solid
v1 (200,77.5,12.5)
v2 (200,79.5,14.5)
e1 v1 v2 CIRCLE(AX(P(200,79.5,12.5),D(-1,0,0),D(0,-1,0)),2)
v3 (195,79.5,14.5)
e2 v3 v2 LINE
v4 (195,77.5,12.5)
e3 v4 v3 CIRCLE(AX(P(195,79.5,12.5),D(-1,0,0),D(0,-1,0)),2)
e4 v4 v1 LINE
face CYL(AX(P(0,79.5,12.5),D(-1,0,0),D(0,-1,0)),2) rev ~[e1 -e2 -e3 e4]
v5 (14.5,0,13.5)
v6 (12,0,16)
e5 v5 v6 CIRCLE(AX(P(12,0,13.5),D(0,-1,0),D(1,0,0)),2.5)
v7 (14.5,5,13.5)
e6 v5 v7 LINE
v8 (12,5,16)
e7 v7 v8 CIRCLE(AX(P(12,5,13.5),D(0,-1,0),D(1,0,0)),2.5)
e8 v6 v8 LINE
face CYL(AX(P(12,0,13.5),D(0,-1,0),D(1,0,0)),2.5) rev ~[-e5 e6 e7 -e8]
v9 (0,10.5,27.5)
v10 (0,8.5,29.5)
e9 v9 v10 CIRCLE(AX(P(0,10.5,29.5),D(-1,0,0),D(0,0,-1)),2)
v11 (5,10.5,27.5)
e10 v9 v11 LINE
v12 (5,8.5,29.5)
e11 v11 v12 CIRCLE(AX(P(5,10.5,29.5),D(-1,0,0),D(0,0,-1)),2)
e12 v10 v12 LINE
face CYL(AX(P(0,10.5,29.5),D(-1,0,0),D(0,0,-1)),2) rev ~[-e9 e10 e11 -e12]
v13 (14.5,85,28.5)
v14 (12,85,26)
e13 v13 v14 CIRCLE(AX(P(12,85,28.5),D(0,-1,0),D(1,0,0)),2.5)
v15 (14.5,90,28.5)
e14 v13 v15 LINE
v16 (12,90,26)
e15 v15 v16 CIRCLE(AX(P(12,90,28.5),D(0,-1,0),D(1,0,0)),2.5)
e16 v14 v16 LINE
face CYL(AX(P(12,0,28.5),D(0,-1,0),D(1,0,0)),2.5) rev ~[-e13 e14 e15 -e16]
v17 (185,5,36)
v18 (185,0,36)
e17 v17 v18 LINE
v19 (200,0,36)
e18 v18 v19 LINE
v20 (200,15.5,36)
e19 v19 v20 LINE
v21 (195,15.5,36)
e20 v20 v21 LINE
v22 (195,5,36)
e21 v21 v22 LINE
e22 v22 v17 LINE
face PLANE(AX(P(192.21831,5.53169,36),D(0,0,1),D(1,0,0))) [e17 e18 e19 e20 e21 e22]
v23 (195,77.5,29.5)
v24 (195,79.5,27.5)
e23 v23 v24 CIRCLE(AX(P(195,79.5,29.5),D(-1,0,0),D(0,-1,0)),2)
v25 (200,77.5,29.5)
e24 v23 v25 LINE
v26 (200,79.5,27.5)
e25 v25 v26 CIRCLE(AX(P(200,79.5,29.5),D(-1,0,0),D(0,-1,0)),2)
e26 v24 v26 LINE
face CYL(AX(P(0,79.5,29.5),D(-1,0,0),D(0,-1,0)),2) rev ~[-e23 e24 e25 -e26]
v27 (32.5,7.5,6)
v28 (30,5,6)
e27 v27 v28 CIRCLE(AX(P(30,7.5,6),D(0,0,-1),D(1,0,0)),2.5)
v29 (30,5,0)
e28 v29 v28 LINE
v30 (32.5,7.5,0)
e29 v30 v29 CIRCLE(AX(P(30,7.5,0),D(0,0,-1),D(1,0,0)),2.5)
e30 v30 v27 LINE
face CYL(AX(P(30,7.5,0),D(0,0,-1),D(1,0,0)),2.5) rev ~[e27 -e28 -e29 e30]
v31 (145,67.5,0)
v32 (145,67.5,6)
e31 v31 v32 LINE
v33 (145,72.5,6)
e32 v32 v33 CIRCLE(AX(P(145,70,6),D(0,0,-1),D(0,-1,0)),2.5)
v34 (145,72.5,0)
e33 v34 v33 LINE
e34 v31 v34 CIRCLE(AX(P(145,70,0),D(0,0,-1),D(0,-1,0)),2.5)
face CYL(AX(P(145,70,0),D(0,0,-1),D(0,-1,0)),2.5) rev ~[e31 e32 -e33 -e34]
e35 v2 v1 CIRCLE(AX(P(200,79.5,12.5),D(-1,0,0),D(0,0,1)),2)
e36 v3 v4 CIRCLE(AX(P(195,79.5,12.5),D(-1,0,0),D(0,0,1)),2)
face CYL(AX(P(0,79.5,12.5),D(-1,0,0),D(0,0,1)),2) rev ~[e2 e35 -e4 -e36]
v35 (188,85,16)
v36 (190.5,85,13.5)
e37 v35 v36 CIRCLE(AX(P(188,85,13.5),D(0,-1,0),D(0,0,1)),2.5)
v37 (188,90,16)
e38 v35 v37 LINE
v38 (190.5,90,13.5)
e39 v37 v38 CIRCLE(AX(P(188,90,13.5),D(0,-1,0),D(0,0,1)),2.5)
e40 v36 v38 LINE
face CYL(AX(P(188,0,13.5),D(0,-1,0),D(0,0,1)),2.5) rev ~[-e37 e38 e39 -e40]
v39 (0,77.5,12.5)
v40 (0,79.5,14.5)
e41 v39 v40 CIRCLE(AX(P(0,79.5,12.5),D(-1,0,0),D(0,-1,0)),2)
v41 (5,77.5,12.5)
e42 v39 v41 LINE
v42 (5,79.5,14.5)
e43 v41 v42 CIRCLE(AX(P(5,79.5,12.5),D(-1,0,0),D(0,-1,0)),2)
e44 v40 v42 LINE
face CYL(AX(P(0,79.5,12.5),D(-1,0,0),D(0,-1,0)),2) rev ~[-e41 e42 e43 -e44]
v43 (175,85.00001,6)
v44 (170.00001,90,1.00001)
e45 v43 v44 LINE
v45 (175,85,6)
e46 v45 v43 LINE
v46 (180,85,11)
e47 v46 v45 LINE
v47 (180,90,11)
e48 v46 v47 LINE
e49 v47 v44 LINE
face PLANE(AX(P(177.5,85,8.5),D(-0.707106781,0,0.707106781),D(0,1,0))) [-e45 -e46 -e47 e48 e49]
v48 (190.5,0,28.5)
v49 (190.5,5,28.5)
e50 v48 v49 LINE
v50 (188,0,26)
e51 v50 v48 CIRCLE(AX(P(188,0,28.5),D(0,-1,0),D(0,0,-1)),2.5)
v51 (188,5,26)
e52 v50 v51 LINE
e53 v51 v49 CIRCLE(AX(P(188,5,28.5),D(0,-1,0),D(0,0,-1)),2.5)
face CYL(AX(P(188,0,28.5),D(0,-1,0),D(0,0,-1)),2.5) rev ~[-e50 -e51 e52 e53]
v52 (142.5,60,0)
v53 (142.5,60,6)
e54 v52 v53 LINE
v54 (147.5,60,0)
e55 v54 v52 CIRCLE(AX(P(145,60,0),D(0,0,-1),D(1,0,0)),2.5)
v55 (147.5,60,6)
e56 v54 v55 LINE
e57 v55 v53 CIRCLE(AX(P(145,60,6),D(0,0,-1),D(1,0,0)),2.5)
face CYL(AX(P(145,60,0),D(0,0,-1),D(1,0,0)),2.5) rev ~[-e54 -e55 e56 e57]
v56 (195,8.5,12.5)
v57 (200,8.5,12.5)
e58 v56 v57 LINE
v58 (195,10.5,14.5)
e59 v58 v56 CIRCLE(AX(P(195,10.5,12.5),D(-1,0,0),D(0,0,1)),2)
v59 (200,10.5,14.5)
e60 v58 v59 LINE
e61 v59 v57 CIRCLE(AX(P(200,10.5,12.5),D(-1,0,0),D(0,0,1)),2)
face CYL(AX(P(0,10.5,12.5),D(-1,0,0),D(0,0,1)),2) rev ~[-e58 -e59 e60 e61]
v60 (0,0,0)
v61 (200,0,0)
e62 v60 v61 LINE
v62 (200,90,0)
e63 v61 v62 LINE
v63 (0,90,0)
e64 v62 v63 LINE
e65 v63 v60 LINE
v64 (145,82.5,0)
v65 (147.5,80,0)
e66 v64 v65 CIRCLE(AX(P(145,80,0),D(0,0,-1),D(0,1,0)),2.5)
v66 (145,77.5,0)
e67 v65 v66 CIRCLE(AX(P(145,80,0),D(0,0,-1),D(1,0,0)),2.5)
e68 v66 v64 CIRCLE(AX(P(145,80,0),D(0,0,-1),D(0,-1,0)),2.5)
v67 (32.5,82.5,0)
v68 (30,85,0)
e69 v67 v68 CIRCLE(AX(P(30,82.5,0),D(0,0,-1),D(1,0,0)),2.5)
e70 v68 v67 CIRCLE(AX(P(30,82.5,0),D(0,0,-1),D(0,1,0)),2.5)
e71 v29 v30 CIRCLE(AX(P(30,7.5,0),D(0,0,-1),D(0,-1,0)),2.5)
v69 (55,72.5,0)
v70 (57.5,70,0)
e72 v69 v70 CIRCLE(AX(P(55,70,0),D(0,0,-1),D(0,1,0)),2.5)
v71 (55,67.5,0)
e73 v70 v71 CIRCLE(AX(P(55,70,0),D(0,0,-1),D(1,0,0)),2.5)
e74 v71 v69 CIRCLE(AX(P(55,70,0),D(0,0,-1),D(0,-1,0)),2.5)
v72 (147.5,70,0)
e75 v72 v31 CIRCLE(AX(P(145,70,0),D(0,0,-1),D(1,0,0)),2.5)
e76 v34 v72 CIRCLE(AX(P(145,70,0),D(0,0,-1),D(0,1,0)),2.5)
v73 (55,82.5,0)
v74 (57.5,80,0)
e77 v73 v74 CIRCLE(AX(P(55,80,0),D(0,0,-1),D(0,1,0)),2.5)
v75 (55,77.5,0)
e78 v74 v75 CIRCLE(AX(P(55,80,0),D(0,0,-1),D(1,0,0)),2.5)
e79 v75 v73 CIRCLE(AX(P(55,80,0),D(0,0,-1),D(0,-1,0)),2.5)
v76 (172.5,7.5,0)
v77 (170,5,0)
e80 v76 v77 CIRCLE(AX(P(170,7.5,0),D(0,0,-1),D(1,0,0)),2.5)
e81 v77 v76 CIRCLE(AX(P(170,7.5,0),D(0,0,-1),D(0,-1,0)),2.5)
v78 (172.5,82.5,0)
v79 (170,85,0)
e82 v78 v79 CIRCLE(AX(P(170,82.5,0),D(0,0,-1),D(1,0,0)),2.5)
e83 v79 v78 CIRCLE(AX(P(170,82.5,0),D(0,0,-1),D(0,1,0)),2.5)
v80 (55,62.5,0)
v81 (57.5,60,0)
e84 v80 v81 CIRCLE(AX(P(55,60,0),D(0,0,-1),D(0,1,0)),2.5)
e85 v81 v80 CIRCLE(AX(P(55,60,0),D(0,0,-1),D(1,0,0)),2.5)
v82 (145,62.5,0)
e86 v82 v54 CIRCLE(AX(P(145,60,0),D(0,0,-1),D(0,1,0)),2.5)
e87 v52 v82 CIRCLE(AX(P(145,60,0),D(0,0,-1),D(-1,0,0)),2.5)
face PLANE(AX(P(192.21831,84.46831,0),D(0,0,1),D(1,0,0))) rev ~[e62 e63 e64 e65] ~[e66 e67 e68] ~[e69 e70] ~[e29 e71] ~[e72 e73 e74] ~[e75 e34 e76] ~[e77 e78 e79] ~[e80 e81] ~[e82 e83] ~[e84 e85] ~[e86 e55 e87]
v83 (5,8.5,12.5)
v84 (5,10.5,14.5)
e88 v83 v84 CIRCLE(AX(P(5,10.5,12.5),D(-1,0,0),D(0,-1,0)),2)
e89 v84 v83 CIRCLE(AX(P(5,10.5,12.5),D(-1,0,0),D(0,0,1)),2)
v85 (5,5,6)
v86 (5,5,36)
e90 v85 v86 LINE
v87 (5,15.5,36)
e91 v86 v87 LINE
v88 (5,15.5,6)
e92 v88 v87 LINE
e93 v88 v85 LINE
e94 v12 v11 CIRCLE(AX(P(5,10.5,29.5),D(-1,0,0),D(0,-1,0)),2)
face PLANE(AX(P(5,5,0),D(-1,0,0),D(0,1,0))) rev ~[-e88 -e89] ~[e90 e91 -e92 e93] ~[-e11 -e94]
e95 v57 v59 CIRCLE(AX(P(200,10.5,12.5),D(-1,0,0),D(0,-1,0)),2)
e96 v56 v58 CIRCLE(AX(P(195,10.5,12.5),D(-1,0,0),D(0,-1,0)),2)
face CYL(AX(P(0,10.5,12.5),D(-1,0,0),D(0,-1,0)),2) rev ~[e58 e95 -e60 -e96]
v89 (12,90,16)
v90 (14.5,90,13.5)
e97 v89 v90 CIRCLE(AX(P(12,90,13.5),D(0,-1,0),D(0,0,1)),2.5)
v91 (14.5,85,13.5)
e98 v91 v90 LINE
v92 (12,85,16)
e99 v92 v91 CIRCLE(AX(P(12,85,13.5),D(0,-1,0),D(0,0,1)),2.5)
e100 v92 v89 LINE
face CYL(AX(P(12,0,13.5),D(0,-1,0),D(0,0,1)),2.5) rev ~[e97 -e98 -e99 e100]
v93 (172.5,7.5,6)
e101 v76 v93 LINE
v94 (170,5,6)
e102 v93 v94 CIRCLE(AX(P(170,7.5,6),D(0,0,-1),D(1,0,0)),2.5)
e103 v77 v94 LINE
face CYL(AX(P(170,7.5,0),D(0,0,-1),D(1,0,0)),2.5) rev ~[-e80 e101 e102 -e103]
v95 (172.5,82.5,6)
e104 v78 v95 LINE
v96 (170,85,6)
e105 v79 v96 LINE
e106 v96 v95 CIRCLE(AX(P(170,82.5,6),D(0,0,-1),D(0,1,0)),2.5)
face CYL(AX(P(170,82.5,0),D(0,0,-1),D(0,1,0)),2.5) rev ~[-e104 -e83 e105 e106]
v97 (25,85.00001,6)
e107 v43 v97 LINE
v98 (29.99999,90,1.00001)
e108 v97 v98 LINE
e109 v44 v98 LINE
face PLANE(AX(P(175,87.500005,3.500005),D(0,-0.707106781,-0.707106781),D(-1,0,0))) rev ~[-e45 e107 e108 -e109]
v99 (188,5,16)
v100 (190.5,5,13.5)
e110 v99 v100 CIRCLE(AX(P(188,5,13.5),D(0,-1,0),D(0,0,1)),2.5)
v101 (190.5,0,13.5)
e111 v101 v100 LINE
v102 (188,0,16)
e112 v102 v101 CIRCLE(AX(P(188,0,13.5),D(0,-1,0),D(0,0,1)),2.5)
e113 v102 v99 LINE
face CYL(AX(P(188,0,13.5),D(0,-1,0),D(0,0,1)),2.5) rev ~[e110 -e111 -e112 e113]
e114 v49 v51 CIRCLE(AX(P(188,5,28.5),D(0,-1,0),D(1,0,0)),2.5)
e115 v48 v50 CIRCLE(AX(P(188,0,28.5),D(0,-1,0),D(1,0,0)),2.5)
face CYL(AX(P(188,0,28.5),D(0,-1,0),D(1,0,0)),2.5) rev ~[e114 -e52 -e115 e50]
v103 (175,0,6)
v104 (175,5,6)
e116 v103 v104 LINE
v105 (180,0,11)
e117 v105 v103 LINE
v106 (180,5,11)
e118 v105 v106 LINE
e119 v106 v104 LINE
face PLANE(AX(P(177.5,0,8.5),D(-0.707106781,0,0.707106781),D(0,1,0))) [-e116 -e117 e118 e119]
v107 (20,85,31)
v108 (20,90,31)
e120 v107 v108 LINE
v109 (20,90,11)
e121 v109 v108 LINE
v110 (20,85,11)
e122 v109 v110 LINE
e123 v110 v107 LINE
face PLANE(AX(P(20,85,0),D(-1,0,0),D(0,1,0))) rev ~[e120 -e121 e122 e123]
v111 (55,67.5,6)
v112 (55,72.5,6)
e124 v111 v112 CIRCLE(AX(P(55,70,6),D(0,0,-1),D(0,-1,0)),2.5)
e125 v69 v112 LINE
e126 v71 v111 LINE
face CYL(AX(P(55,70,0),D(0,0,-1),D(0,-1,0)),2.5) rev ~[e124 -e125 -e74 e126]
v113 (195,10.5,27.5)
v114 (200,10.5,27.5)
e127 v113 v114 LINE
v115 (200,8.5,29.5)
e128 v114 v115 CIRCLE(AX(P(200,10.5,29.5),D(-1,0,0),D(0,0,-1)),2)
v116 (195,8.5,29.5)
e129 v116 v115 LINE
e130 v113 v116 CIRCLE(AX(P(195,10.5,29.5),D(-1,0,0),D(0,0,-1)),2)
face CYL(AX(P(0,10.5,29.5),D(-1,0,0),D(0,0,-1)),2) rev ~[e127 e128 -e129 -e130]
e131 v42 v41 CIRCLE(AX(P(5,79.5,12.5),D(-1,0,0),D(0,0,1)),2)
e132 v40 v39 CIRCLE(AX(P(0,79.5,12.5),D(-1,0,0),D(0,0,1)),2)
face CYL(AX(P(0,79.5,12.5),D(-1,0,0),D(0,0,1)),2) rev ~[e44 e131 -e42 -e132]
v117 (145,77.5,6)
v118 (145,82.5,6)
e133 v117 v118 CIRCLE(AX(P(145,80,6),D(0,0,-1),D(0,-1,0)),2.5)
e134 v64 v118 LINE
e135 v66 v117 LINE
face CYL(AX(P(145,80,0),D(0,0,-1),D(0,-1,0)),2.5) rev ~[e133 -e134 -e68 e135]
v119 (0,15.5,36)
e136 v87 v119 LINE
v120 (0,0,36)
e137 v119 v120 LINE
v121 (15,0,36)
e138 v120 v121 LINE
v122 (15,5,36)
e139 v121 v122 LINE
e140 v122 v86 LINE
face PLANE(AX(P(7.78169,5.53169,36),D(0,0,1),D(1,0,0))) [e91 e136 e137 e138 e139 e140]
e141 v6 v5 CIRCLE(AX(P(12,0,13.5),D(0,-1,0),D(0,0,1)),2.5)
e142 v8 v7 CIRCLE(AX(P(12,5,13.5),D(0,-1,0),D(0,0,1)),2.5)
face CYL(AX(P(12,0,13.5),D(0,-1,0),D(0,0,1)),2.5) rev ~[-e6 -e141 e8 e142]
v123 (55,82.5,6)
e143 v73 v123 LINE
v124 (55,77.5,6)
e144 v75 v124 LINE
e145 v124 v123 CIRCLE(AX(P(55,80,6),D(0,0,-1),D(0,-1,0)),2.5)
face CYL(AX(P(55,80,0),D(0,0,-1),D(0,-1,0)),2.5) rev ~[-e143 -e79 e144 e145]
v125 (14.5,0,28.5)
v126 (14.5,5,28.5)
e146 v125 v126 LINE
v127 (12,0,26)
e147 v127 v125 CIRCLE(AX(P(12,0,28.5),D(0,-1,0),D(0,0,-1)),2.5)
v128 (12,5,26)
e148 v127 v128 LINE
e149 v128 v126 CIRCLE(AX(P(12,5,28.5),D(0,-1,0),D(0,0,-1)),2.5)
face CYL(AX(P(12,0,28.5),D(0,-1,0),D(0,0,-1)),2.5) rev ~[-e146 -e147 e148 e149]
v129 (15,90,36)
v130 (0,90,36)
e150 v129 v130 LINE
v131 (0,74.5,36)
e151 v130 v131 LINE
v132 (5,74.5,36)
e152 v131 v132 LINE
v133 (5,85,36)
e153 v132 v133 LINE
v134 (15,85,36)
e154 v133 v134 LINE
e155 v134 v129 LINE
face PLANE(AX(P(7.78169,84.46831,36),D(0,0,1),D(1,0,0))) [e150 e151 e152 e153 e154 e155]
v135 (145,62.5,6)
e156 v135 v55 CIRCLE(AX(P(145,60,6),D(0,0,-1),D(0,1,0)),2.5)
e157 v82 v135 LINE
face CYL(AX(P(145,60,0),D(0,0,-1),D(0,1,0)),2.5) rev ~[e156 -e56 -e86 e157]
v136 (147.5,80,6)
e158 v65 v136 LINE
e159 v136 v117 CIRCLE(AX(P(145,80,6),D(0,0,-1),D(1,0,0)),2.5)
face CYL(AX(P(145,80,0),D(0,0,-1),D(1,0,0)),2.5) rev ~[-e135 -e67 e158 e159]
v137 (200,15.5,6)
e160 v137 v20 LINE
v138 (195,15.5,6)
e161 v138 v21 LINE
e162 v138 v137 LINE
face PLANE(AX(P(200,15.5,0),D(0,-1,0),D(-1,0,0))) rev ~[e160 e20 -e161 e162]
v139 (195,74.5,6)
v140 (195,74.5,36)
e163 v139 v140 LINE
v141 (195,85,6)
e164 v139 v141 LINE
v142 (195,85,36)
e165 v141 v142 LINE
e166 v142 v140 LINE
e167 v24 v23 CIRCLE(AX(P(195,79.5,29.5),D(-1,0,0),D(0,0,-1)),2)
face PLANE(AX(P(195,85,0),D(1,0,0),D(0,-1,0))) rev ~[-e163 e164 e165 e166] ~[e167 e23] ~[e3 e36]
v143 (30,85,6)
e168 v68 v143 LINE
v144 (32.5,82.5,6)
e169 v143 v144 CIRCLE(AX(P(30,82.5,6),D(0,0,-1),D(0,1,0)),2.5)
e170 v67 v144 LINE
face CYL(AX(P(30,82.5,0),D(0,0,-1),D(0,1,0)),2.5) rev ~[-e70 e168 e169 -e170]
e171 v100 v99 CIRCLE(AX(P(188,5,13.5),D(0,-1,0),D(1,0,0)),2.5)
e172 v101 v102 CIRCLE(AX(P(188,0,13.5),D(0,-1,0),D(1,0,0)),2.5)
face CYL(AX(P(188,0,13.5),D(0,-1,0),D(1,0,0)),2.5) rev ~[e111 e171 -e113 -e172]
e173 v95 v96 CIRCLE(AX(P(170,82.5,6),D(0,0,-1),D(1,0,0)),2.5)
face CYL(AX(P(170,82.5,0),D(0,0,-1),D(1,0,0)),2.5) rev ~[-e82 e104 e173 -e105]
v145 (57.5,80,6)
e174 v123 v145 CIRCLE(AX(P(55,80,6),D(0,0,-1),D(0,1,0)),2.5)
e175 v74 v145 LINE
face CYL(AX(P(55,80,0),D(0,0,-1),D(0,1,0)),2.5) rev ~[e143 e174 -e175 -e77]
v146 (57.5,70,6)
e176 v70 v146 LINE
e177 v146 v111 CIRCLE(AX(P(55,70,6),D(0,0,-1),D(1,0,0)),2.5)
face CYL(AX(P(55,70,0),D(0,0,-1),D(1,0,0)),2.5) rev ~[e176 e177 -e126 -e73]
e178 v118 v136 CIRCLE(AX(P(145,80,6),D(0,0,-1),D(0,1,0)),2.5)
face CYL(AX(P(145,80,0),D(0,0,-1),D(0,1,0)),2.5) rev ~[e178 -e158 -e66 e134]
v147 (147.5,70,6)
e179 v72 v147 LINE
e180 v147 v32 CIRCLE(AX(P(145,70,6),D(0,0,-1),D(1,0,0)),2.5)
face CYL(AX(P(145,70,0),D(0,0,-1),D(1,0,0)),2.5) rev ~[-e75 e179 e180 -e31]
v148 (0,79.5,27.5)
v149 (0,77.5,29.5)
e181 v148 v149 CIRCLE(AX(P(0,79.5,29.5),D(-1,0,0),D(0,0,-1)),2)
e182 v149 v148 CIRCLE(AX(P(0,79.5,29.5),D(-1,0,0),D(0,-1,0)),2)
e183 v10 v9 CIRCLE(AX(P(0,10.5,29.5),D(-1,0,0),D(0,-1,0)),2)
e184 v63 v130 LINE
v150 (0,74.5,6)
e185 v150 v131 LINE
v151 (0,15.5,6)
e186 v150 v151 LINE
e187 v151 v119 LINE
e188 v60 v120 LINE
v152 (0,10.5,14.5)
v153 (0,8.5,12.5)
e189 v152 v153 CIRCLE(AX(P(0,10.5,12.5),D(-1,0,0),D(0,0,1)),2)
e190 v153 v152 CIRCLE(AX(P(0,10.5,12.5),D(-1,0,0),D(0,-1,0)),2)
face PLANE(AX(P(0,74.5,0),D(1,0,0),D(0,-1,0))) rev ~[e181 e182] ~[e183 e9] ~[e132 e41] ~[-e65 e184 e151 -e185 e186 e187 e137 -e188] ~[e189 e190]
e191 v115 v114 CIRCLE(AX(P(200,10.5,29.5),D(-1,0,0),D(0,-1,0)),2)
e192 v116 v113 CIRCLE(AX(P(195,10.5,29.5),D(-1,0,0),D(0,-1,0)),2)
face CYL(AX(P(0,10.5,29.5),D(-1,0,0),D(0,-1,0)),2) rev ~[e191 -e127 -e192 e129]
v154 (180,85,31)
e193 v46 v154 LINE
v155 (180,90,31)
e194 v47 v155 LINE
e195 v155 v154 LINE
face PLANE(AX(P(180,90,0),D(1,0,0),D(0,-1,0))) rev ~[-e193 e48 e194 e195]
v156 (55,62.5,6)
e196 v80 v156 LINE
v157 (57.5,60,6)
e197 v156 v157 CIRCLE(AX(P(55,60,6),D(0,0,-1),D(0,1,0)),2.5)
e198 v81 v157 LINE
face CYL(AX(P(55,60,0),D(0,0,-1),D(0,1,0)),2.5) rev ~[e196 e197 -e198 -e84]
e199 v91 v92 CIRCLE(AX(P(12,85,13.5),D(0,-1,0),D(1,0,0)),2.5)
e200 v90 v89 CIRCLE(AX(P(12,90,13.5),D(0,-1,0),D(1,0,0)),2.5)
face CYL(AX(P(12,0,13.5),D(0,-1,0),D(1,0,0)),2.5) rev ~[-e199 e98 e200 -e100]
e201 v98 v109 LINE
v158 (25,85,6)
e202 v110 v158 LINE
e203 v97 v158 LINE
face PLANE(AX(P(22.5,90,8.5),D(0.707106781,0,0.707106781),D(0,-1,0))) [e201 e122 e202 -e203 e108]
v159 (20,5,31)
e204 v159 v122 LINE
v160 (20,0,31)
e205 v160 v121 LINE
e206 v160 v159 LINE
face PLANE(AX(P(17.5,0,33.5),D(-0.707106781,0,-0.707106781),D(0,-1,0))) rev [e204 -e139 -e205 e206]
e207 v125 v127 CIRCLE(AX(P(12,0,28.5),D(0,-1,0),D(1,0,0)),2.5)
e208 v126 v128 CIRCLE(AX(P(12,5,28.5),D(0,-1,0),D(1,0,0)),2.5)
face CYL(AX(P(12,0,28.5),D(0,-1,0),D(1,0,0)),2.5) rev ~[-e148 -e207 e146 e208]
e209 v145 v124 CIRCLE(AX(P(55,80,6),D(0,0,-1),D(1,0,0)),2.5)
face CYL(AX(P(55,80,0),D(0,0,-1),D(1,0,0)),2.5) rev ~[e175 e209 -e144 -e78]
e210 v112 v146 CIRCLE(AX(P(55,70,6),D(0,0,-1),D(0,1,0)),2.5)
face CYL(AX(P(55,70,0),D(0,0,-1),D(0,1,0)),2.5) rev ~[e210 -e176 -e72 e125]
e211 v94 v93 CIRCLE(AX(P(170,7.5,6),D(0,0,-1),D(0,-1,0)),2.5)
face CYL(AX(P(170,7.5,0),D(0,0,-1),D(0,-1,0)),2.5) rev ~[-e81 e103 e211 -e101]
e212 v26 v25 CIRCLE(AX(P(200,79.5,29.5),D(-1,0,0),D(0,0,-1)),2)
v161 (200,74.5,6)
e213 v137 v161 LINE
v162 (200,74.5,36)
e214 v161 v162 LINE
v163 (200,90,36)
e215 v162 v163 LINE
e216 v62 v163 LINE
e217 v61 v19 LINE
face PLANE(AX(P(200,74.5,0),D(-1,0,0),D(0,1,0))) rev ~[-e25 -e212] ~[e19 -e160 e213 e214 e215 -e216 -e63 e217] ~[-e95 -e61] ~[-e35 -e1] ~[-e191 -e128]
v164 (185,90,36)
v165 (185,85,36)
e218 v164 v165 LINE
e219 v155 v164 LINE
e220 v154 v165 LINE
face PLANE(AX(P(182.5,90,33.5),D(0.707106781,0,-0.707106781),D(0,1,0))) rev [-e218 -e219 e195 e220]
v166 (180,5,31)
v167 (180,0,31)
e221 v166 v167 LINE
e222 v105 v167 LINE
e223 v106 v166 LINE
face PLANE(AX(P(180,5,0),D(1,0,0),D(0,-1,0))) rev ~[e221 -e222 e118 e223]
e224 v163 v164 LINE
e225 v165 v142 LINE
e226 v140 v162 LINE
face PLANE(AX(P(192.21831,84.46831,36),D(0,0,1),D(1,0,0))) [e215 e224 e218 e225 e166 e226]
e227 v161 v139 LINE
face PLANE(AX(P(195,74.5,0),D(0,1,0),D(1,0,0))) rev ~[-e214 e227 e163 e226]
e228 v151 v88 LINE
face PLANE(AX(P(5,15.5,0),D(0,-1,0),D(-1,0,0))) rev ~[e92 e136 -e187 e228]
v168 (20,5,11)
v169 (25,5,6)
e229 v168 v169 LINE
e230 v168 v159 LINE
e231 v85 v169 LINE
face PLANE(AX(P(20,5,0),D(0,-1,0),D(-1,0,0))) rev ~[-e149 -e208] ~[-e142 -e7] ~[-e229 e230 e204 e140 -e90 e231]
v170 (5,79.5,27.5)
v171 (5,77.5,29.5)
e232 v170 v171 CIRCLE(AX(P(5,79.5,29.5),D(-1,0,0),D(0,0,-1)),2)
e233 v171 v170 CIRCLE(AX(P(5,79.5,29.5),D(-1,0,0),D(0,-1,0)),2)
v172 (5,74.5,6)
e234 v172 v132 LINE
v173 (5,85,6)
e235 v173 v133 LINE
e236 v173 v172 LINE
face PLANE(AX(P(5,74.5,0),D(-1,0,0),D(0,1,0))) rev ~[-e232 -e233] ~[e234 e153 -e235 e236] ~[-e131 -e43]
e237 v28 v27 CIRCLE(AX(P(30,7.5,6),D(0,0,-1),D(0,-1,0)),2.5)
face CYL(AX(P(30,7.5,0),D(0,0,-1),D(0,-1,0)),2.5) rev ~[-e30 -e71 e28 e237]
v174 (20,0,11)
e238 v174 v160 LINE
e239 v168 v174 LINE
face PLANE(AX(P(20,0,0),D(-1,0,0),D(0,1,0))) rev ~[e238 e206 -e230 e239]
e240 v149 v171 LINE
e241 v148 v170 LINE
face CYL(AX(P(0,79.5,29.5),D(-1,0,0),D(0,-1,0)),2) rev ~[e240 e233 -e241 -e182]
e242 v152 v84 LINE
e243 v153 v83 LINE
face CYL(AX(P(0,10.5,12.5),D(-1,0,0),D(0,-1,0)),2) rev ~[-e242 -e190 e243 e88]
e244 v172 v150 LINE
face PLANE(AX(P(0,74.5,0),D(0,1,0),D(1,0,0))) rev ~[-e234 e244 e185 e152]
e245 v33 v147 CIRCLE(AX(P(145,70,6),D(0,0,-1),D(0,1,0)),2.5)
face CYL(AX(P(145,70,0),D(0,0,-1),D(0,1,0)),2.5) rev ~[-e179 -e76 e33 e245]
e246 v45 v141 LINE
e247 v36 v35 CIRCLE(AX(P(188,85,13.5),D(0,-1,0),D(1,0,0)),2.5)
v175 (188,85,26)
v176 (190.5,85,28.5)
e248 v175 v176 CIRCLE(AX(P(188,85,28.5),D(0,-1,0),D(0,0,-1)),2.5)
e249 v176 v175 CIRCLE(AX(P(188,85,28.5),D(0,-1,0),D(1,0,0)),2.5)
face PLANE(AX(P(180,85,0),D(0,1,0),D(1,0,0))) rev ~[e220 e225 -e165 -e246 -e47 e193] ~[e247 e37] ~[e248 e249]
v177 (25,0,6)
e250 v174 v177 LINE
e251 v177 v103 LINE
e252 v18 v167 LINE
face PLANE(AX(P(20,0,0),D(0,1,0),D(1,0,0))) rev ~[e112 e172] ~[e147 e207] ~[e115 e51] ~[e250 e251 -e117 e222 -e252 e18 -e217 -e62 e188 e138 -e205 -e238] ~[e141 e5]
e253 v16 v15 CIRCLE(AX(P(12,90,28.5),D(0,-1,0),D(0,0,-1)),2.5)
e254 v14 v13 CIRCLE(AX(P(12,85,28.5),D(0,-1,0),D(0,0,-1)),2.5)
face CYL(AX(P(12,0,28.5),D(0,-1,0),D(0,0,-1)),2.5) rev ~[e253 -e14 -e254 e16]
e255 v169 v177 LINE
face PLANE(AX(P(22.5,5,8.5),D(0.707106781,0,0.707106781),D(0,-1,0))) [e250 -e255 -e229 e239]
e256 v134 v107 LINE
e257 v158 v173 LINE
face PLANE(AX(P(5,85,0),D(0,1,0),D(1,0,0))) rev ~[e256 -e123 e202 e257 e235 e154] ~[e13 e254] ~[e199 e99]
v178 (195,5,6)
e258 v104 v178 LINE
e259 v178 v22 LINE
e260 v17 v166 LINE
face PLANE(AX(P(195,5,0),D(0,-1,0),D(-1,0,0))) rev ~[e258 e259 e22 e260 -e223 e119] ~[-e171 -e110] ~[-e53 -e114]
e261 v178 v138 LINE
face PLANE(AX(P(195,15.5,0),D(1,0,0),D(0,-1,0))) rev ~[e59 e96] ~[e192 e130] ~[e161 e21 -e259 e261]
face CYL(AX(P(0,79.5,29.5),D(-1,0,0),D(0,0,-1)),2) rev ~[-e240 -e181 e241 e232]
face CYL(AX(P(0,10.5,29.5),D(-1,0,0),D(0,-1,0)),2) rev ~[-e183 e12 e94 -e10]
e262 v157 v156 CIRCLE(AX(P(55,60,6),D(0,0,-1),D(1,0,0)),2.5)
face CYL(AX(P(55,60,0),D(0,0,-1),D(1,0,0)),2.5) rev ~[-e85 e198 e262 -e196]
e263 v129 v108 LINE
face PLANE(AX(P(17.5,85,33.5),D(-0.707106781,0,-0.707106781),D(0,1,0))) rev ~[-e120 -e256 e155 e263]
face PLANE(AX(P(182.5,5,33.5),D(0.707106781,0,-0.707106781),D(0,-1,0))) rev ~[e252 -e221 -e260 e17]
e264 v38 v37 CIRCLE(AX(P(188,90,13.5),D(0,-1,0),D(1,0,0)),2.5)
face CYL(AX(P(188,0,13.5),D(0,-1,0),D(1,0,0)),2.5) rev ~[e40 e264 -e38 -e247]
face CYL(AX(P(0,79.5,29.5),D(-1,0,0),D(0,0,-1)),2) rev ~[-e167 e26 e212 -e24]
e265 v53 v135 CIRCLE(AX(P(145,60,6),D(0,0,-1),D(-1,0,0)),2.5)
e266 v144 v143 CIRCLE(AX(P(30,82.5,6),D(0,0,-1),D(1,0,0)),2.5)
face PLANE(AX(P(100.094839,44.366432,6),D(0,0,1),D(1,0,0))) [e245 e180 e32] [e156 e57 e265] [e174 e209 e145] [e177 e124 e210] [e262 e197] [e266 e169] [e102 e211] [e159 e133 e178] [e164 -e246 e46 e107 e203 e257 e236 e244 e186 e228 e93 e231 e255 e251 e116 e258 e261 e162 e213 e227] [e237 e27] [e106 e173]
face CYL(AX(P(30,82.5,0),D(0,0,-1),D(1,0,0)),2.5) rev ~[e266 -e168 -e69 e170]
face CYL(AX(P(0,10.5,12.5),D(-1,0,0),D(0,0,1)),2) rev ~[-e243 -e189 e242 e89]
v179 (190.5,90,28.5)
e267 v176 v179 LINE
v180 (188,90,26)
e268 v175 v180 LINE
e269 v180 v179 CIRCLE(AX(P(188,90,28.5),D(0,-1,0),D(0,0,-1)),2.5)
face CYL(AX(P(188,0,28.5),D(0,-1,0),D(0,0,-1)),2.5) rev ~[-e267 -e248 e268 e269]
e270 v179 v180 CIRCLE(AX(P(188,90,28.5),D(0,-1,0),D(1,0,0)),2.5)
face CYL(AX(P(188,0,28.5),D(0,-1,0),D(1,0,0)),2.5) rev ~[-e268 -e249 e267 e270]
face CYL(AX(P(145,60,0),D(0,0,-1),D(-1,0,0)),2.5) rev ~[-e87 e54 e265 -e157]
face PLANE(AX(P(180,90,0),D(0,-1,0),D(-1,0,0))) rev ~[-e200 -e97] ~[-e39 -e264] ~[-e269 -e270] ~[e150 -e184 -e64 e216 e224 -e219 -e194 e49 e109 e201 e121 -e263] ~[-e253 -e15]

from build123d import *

# Parameters (mm, degrees)
F1_DEPTH = 6
F2_DEPTH = 36
F3_SIZE  = 5
F6_DEPTH = 210
F7_DEPTH = 100
F8_SIZE  = 4.99999


# Not quite as in the source:
# - a fillet or chamfer is up to 0.001 mm smaller than in the source, because OpenCascade refuses the exact size


with BuildPart() as f1:
    # F0 (on Top) → F1 (new body)
    with BuildSketch(Plane.XY):
        with BuildLine():
            Line((20, 5), (20, 0))
            Line((20, 0), (30, 0))
            Line((30, 0), (170, 0))
            Line((170, 0), (180, 0))
            Line((180, 0), (180, 5))
            Line((180, 5), (195, 5))
            Line((195, 5), (195, 15.5))
            Line((195, 15.5), (200, 15.5))
            Line((200, 15.5), (200, 74.5))
            Line((200, 74.5), (195, 74.5))
            Line((195, 74.5), (195, 85))
            Line((195, 85), (180, 85))
            Line((180, 85), (180, 90))
            Line((180, 90), (170, 90))
            Line((170, 90), (145, 90))
            Line((145, 90), (145, 82.5))
            ThreePointArc((145, 82.5), (146.767766953, 81.767766953), (147.5, 80))
            ThreePointArc((147.5, 80), (146.767766953, 78.232233047), (145, 77.5))
            Line((145, 77.5), (145, 72.5))
            ThreePointArc((145, 72.5), (146.767766953, 71.767766953), (147.5, 70))
            ThreePointArc((147.5, 70), (146.767766953, 68.232233047), (145, 67.5))
            Line((145, 67.5), (145, 62.5))
            ThreePointArc((145, 62.5), (146.767766953, 61.767766953), (147.5, 60))
            ThreePointArc((147.5, 60), (145, 57.5), (142.5, 60))
            Line((142.5, 60), (100, 60))
            Line((100, 60), (57.5, 60))
            ThreePointArc((57.5, 60), (53.232233047, 58.232233047), (55, 62.5))
            Line((55, 62.5), (55, 67.5))
            ThreePointArc((55, 67.5), (52.5, 70), (55, 72.5))
            Line((55, 72.5), (55, 77.5))
            ThreePointArc((55, 77.5), (52.5, 80), (55, 82.5))
            Line((55, 82.5), (55, 90))
            Line((55, 90), (30, 90))
            Line((30, 90), (20, 90))
            Line((20, 90), (20, 85))
            Line((20, 85), (5, 85))
            Line((5, 85), (5, 74.5))
            Line((5, 74.5), (0, 74.5))
            Line((0, 74.5), (0, 15.5))
            Line((0, 15.5), (5, 15.5))
            Line((5, 15.5), (5, 5))
            Line((5, 5), (20, 5))
        make_face()
        with BuildLine():
            ThreePointArc((32.5, 7.5), (31.767766953, 5.732233047), (30, 5))
            ThreePointArc((30, 5), (28.232233047, 9.267766953), (32.5, 7.5))
        make_face(mode=Mode.SUBTRACT)
        with BuildLine():
            ThreePointArc((172.5, 7.5), (171.767766953, 5.732233047), (170, 5))
            ThreePointArc((170, 5), (168.232233047, 9.267766953), (172.5, 7.5))
        make_face(mode=Mode.SUBTRACT)
        with BuildLine():
            ThreePointArc((32.5, 82.5), (28.232233047, 80.732233047), (30, 85))
            ThreePointArc((30, 85), (31.767766953, 84.267766953), (32.5, 82.5))
        make_face(mode=Mode.SUBTRACT)
        with BuildLine():
            ThreePointArc((172.5, 82.5), (168.232233047, 80.732233047), (170, 85))
            ThreePointArc((170, 85), (171.767766953, 84.267766953), (172.5, 82.5))
        make_face(mode=Mode.SUBTRACT)
        with BuildLine():
            Line((100, 90), (55, 90))
            Line((55, 90), (55, 82.5))
            ThreePointArc((55, 82.5), (56.767766953, 81.767766953), (57.5, 80))
            ThreePointArc((57.5, 80), (56.767766953, 78.232233047), (55, 77.5))
            Line((55, 77.5), (55, 72.5))
            ThreePointArc((55, 72.5), (56.767766953, 71.767766953), (57.5, 70))
            ThreePointArc((57.5, 70), (56.767766953, 68.232233047), (55, 67.5))
            Line((55, 67.5), (55, 62.5))
            ThreePointArc((55, 62.5), (56.767766953, 61.767766953), (57.5, 60))
            Line((57.5, 60), (100, 60))
            Line((100, 60), (100, 90))
        make_face()
        with BuildLine():
            Line((145, 90), (100, 90))
            Line((100, 90), (100, 60))
            Line((100, 60), (142.5, 60))
            ThreePointArc((142.5, 60), (143.232233047, 61.767766953), (145, 62.5))
            Line((145, 62.5), (145, 67.5))
            ThreePointArc((145, 67.5), (142.5, 70), (145, 72.5))
            Line((145, 72.5), (145, 77.5))
            ThreePointArc((145, 77.5), (142.5, 80), (145, 82.5))
            Line((145, 82.5), (145, 90))
        make_face()
    extrude(amount=F1_DEPTH)

    # F0 (on Top) → F2 (join)
    with BuildSketch(Plane.XY):
        Polygon((195, 74.5), (200, 74.5), (200, 90), (180, 90), (180, 85), (195, 85), align=None)
        Polygon((180, 5), (180, 0), (200, 0), (200, 15.5), (195, 15.5), (195, 5), align=None)
        Polygon((0, 15.5), (0, 0), (20, 0), (20, 5), (5, 5), (5, 15.5), align=None)
        Polygon((0, 90), (0, 74.5), (5, 74.5), (5, 85), (20, 85), (20, 90), align=None)
    extrude(amount=F2_DEPTH)

    # F3
    f3_edges = [f1.edges().sort_by_distance(p)[0] for p in [
        (180, 87.5, 6),
        (180, 2.5, 6),
        (180, 2.5, 36),
        (180, 87.5, 36),
        (20, 87.5, 36),
        (20, 2.5, 36),
        (20, 87.5, 6),
        (20, 2.5, 6),
    ]]
    chamfer(f3_edges, length=F3_SIZE)

    # F5 (on face) → F6 (cut)
    with BuildSketch(Plane(origin=(0, 0, 0), x_dir=(0, -1, 0), z_dir=(-1, 0, 0))):
        with BuildLine():
            ThreePointArc((-77.5, 29.5), (-80.9142135624, 30.9142135624), (-79.5, 27.5))
            ThreePointArc((-79.5, 27.5), (-78.0857864376, 28.0857864376), (-77.5, 29.5))
        make_face()
        with BuildLine():
            ThreePointArc((-77.5, 12.5), (-78.0857864376, 13.9142135624), (-79.5, 14.5))
            ThreePointArc((-79.5, 14.5), (-80.9142135624, 11.0857864376), (-77.5, 12.5))
        make_face()
        with BuildLine():
            ThreePointArc((-8.5, 29.5), (-11.9142135624, 30.9142135624), (-10.5, 27.5))
            ThreePointArc((-10.5, 27.5), (-9.0857864376, 28.0857864376), (-8.5, 29.5))
        make_face()
        with BuildLine():
            ThreePointArc((-8.5, 12.5), (-9.0857864376, 13.9142135624), (-10.5, 14.5))
            ThreePointArc((-10.5, 14.5), (-11.9142135624, 11.0857864376), (-8.5, 12.5))
        make_face()
    extrude(amount=-F6_DEPTH, mode=Mode.SUBTRACT)

    # F4 (on face) → F7 (cut)
    with BuildSketch(Plane.XZ):
        with BuildLine():
            ThreePointArc((14.5, 28.5), (10.232233047, 30.267766953), (12, 26))
            ThreePointArc((12, 26), (13.767766953, 26.732233047), (14.5, 28.5))
        make_face()
        with BuildLine():
            ThreePointArc((14.5, 13.5), (13.767766953, 15.267766953), (12, 16))
            ThreePointArc((12, 16), (10.232233047, 11.732233047), (14.5, 13.5))
        make_face()
        with BuildLine():
            ThreePointArc((190.5, 28.5), (186.232233047, 30.267766953), (188, 26))
            ThreePointArc((188, 26), (189.767766953, 26.732233047), (190.5, 28.5))
        make_face()
        with BuildLine():
            ThreePointArc((190.5, 13.5), (189.767766953, 15.267766953), (188, 16))
            ThreePointArc((188, 16), (186.232233047, 11.732233047), (190.5, 13.5))
        make_face()
    extrude(amount=-F7_DEPTH, mode=Mode.SUBTRACT)

    # F8 (size 5 in the source; OpenCascade refuses exactly that, so slightly less here)
    f8_edges = [f1.edges().sort_by_distance(p)[0] for p in [
        (100, 90, 6),
    ]]
    chamfer(f8_edges, length=F8_SIZE)


solid = f1.part
